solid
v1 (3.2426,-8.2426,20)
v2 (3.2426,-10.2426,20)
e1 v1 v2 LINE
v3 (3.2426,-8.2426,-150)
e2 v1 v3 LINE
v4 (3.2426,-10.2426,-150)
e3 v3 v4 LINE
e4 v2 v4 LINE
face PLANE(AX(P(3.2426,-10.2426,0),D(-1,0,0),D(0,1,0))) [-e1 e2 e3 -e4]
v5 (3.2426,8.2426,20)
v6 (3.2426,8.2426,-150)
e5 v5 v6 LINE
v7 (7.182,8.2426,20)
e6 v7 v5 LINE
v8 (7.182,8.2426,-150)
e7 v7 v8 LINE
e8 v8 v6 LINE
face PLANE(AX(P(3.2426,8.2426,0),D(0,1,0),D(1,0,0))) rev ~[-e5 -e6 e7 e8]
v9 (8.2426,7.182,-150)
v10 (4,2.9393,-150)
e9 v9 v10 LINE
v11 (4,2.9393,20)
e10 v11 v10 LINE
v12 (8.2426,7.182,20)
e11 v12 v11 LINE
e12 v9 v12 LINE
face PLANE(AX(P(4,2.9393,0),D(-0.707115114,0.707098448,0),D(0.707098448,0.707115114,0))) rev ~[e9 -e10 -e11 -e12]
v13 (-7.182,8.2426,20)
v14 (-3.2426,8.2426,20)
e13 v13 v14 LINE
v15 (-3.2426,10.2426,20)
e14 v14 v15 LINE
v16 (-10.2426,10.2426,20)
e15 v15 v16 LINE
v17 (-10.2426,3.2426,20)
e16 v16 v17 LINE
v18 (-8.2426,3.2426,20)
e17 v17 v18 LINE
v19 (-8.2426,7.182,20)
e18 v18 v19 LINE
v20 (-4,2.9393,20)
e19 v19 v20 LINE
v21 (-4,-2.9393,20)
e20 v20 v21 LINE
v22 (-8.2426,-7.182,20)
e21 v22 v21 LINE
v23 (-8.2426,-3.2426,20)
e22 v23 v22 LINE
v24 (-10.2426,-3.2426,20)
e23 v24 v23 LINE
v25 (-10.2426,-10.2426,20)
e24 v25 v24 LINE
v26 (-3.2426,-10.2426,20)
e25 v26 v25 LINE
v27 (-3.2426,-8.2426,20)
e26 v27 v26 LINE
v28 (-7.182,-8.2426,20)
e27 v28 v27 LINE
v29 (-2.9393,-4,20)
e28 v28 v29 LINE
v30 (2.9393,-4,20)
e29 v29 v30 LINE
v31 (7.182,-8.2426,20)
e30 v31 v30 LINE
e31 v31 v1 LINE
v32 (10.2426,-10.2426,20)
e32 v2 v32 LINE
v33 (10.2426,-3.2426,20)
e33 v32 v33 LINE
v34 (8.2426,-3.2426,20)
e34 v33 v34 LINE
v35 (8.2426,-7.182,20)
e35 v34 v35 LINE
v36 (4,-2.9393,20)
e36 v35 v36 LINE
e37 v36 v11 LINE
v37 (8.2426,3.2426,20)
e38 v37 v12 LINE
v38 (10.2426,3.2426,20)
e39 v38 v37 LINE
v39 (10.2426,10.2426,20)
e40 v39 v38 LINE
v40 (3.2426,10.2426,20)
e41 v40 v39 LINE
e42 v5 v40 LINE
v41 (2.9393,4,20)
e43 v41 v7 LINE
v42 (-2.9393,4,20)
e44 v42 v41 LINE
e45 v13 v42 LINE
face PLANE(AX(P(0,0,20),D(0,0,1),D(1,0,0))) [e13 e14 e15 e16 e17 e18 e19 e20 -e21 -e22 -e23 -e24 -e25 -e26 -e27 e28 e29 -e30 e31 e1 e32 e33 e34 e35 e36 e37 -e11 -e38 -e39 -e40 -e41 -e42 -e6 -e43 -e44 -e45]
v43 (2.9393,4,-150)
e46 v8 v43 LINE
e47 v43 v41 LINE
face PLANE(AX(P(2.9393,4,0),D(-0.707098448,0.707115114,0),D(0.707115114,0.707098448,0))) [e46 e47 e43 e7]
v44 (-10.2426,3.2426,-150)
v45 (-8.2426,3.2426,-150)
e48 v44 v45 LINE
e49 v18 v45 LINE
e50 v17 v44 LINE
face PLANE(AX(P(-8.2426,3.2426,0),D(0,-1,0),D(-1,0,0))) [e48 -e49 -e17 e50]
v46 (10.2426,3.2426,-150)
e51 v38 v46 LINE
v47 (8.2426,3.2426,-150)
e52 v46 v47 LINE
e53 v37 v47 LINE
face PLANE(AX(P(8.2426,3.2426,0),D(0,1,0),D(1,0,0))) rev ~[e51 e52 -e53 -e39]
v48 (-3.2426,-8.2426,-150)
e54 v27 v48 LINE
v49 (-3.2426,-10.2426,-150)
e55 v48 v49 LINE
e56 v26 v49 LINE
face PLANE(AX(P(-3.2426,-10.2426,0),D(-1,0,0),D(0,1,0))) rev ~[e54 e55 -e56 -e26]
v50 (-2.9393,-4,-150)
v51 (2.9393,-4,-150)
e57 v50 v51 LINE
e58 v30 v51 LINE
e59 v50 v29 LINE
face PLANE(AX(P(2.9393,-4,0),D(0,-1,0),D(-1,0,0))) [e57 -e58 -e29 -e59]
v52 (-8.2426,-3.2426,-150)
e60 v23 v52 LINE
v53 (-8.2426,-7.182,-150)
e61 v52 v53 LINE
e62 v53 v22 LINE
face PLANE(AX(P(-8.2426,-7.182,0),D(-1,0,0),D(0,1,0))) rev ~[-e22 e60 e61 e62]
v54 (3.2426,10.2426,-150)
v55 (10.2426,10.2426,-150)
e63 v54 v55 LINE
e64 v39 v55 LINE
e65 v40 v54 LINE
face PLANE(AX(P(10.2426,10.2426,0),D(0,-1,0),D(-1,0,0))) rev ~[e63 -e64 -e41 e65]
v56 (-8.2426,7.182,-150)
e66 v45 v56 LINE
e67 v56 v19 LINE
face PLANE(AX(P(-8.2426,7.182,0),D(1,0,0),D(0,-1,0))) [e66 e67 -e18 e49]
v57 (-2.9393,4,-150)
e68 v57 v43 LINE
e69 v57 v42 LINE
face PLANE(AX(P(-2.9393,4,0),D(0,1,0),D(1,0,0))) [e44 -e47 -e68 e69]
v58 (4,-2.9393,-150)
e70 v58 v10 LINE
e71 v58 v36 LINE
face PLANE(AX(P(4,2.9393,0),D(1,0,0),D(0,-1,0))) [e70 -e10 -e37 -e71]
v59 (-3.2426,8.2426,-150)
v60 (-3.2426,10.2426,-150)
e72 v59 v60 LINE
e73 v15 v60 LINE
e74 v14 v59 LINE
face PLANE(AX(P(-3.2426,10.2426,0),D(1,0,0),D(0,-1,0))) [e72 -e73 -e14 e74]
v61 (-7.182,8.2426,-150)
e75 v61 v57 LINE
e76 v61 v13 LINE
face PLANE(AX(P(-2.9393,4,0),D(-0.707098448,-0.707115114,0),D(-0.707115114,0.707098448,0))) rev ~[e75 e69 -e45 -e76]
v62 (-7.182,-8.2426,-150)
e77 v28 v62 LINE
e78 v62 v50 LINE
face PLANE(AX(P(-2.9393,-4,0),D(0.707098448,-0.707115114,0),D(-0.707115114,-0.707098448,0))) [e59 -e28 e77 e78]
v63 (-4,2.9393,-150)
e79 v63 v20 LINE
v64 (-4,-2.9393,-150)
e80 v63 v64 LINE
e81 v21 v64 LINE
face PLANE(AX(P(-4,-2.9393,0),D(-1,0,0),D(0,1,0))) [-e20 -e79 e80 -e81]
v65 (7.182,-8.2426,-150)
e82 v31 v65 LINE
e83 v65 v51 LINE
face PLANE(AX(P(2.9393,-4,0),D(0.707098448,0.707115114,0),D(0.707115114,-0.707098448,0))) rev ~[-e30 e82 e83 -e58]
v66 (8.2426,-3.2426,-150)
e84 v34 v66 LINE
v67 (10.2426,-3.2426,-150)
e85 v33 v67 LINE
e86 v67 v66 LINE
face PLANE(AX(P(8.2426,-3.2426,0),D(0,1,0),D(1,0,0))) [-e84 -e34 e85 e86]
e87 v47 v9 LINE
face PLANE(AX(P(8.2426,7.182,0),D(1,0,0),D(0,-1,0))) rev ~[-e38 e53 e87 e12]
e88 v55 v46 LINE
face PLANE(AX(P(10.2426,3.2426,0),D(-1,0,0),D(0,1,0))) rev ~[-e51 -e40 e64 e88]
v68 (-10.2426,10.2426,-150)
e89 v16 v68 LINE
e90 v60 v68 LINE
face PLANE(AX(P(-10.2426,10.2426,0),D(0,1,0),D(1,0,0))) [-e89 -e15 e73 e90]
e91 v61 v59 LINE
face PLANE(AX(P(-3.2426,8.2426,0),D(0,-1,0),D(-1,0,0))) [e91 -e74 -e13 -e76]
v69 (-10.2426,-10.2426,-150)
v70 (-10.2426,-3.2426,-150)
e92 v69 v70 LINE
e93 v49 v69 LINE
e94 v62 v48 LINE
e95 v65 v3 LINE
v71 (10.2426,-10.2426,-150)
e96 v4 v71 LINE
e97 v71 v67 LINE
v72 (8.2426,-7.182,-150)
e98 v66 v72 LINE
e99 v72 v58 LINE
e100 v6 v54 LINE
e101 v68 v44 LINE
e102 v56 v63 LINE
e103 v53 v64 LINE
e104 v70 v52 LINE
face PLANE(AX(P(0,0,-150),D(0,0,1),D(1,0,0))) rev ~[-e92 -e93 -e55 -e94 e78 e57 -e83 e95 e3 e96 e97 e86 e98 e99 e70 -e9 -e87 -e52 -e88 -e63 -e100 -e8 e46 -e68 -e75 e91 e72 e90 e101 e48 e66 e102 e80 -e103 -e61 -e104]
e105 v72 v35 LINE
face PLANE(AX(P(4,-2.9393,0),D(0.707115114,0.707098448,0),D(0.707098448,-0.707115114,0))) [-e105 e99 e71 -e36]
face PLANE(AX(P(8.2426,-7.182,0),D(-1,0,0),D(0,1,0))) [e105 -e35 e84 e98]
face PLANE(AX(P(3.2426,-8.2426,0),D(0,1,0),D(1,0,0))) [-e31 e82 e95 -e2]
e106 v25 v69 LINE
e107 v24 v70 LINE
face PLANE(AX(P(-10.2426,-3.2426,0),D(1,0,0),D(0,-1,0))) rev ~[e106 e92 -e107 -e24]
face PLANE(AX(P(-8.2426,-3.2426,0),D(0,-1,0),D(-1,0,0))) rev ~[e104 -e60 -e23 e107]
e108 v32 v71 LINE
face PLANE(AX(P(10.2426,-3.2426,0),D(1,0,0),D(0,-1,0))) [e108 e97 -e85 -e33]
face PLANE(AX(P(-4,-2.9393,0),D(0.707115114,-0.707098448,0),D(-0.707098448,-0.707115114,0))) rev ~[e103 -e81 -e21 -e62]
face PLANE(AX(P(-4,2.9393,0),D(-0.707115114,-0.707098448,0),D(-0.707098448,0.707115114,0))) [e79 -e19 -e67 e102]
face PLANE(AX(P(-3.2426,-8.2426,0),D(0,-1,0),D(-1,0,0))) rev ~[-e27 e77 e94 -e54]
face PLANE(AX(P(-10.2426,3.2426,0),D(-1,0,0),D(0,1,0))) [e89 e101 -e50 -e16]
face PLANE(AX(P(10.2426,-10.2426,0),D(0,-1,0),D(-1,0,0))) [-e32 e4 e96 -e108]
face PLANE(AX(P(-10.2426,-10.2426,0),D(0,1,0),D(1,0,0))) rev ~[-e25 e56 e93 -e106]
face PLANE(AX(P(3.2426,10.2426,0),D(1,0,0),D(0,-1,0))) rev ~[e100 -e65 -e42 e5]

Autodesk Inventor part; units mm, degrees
ref_plane "YZ Plane" through (0, 0, 0) normal (1, 0, 0) x (0, 1, 0)
ref_plane "XZ Plane" through (0, 0, 0) normal (0, 1, 0) x (-1, 0, 0)
ref_plane "XY Plane" through (0, 0, 0) normal (0, 0, 1) x (1, 0, 0)
sketch "Sketch1" plane through (0, 0, 0) normal (0, 0, 1) x (1, 0, 0)
  line L0 (-2.9393, 4) -> (2.9393, 4)
  line L1 (4, 2.9393) -> (4, -2.9393)
  line L2 (2.9393, -4) -> (-2.9393, -4)
  line L3 (-4, -2.9393) -> (-4, 2.9393)
  line L4 (0, 0) -> (4, -4) construction
  line L5 (-0.5303, -0.5303) -> (-4, -4) construction
  line L6 (5.0607, 4) -> (10, 4) construction
  line L7 (8.2426, 7.182) -> (8.2426, 3.2426)
  line L8 (8.2426, 3.2426) -> (10.2426, 3.2426)
  line L9 (10.2426, 3.2426) -> (10.2426, 10.2426)
  line L10 (10.2426, 10.2426) -> (3.2426, 10.2426)
  line L11 (3.2426, 10.2426) -> (3.2426, 8.2426)
  line L12 (3.2426, 8.2426) -> (7.182, 8.2426)
  line L13 (2.9393, 4) -> (7.182, 8.2426)
  line L14 (4, 2.9393) -> (8.2426, 7.182)
  line L15 (-8.2426, 7.182) -> (-8.2426, 3.2426)
  line L16 (-8.2426, 3.2426) -> (-10.2426, 3.2426)
  line L17 (-10.2426, 3.2426) -> (-10.2426, 10.2426)
  line L18 (-10.2426, 10.2426) -> (-3.2426, 10.2426)
  line L19 (-3.2426, 10.2426) -> (-3.2426, 8.2426)
  line L20 (-3.2426, 8.2426) -> (-7.182, 8.2426)
  line L21 (-2.9393, 4) -> (-7.182, 8.2426)
  line L22 (-4, 2.9393) -> (-8.2426, 7.182)
  line L23 (-2.9393, -4) -> (2.9393, -4)
  line L24 (4, -2.9393) -> (4, 2.9393)
  line L25 (-4, 2.9393) -> (-4, -2.9393)
  line L26 (-4, -4) -> (0, 0) construction
  line L27 (5.0607, -4) -> (10, -4) construction
  line L28 (8.2426, -7.182) -> (8.2426, -3.2426)
  line L29 (8.2426, -3.2426) -> (10.2426, -3.2426)
  line L30 (10.2426, -3.2426) -> (10.2426, -10.2426)
  line L31 (10.2426, -10.2426) -> (3.2426, -10.2426)
  line L32 (3.2426, -10.2426) -> (3.2426, -8.2426)
  line L33 (3.2426, -8.2426) -> (7.182, -8.2426)
  line L34 (2.9393, -4) -> (7.182, -8.2426)
  line L35 (4, -2.9393) -> (8.2426, -7.182)
  line L36 (-3.2426, -10.2426) -> (-3.2426, -8.2426)
  line L37 (-2.9393, -4) -> (-7.182, -8.2426)
  line L38 (-8.2426, -7.182) -> (-8.2426, -3.2426)
  line L39 (-3.2426, -8.2426) -> (-7.182, -8.2426)
  line L40 (-4, -2.9393) -> (-8.2426, -7.182)
  line L41 (-10.2426, -3.2426) -> (-10.2426, -10.2426)
  line L42 (-10.2426, -10.2426) -> (-3.2426, -10.2426)
  line L43 (-8.2426, -3.2426) -> (-10.2426, -3.2426)
  point P0 (0, 0)
  point P1 (-4, 4)
  point P2 (-4, 4)
  dimension "d0" = 8
extrude "Extrusion1" add sketch "Sketch1" along normal mid plane 300
move faces "이동3" translate (0, 0, 80) faces at (-1.3333, 0.9798, 150)
move faces "이동4" translate (0, 0, -41) faces at (-1.3333, 1.6869, 230)
move faces "이동5" translate (0, 0, -169) faces at (-1.3333, 1.6869, 189)
properties part number "Beam 380 mm"
